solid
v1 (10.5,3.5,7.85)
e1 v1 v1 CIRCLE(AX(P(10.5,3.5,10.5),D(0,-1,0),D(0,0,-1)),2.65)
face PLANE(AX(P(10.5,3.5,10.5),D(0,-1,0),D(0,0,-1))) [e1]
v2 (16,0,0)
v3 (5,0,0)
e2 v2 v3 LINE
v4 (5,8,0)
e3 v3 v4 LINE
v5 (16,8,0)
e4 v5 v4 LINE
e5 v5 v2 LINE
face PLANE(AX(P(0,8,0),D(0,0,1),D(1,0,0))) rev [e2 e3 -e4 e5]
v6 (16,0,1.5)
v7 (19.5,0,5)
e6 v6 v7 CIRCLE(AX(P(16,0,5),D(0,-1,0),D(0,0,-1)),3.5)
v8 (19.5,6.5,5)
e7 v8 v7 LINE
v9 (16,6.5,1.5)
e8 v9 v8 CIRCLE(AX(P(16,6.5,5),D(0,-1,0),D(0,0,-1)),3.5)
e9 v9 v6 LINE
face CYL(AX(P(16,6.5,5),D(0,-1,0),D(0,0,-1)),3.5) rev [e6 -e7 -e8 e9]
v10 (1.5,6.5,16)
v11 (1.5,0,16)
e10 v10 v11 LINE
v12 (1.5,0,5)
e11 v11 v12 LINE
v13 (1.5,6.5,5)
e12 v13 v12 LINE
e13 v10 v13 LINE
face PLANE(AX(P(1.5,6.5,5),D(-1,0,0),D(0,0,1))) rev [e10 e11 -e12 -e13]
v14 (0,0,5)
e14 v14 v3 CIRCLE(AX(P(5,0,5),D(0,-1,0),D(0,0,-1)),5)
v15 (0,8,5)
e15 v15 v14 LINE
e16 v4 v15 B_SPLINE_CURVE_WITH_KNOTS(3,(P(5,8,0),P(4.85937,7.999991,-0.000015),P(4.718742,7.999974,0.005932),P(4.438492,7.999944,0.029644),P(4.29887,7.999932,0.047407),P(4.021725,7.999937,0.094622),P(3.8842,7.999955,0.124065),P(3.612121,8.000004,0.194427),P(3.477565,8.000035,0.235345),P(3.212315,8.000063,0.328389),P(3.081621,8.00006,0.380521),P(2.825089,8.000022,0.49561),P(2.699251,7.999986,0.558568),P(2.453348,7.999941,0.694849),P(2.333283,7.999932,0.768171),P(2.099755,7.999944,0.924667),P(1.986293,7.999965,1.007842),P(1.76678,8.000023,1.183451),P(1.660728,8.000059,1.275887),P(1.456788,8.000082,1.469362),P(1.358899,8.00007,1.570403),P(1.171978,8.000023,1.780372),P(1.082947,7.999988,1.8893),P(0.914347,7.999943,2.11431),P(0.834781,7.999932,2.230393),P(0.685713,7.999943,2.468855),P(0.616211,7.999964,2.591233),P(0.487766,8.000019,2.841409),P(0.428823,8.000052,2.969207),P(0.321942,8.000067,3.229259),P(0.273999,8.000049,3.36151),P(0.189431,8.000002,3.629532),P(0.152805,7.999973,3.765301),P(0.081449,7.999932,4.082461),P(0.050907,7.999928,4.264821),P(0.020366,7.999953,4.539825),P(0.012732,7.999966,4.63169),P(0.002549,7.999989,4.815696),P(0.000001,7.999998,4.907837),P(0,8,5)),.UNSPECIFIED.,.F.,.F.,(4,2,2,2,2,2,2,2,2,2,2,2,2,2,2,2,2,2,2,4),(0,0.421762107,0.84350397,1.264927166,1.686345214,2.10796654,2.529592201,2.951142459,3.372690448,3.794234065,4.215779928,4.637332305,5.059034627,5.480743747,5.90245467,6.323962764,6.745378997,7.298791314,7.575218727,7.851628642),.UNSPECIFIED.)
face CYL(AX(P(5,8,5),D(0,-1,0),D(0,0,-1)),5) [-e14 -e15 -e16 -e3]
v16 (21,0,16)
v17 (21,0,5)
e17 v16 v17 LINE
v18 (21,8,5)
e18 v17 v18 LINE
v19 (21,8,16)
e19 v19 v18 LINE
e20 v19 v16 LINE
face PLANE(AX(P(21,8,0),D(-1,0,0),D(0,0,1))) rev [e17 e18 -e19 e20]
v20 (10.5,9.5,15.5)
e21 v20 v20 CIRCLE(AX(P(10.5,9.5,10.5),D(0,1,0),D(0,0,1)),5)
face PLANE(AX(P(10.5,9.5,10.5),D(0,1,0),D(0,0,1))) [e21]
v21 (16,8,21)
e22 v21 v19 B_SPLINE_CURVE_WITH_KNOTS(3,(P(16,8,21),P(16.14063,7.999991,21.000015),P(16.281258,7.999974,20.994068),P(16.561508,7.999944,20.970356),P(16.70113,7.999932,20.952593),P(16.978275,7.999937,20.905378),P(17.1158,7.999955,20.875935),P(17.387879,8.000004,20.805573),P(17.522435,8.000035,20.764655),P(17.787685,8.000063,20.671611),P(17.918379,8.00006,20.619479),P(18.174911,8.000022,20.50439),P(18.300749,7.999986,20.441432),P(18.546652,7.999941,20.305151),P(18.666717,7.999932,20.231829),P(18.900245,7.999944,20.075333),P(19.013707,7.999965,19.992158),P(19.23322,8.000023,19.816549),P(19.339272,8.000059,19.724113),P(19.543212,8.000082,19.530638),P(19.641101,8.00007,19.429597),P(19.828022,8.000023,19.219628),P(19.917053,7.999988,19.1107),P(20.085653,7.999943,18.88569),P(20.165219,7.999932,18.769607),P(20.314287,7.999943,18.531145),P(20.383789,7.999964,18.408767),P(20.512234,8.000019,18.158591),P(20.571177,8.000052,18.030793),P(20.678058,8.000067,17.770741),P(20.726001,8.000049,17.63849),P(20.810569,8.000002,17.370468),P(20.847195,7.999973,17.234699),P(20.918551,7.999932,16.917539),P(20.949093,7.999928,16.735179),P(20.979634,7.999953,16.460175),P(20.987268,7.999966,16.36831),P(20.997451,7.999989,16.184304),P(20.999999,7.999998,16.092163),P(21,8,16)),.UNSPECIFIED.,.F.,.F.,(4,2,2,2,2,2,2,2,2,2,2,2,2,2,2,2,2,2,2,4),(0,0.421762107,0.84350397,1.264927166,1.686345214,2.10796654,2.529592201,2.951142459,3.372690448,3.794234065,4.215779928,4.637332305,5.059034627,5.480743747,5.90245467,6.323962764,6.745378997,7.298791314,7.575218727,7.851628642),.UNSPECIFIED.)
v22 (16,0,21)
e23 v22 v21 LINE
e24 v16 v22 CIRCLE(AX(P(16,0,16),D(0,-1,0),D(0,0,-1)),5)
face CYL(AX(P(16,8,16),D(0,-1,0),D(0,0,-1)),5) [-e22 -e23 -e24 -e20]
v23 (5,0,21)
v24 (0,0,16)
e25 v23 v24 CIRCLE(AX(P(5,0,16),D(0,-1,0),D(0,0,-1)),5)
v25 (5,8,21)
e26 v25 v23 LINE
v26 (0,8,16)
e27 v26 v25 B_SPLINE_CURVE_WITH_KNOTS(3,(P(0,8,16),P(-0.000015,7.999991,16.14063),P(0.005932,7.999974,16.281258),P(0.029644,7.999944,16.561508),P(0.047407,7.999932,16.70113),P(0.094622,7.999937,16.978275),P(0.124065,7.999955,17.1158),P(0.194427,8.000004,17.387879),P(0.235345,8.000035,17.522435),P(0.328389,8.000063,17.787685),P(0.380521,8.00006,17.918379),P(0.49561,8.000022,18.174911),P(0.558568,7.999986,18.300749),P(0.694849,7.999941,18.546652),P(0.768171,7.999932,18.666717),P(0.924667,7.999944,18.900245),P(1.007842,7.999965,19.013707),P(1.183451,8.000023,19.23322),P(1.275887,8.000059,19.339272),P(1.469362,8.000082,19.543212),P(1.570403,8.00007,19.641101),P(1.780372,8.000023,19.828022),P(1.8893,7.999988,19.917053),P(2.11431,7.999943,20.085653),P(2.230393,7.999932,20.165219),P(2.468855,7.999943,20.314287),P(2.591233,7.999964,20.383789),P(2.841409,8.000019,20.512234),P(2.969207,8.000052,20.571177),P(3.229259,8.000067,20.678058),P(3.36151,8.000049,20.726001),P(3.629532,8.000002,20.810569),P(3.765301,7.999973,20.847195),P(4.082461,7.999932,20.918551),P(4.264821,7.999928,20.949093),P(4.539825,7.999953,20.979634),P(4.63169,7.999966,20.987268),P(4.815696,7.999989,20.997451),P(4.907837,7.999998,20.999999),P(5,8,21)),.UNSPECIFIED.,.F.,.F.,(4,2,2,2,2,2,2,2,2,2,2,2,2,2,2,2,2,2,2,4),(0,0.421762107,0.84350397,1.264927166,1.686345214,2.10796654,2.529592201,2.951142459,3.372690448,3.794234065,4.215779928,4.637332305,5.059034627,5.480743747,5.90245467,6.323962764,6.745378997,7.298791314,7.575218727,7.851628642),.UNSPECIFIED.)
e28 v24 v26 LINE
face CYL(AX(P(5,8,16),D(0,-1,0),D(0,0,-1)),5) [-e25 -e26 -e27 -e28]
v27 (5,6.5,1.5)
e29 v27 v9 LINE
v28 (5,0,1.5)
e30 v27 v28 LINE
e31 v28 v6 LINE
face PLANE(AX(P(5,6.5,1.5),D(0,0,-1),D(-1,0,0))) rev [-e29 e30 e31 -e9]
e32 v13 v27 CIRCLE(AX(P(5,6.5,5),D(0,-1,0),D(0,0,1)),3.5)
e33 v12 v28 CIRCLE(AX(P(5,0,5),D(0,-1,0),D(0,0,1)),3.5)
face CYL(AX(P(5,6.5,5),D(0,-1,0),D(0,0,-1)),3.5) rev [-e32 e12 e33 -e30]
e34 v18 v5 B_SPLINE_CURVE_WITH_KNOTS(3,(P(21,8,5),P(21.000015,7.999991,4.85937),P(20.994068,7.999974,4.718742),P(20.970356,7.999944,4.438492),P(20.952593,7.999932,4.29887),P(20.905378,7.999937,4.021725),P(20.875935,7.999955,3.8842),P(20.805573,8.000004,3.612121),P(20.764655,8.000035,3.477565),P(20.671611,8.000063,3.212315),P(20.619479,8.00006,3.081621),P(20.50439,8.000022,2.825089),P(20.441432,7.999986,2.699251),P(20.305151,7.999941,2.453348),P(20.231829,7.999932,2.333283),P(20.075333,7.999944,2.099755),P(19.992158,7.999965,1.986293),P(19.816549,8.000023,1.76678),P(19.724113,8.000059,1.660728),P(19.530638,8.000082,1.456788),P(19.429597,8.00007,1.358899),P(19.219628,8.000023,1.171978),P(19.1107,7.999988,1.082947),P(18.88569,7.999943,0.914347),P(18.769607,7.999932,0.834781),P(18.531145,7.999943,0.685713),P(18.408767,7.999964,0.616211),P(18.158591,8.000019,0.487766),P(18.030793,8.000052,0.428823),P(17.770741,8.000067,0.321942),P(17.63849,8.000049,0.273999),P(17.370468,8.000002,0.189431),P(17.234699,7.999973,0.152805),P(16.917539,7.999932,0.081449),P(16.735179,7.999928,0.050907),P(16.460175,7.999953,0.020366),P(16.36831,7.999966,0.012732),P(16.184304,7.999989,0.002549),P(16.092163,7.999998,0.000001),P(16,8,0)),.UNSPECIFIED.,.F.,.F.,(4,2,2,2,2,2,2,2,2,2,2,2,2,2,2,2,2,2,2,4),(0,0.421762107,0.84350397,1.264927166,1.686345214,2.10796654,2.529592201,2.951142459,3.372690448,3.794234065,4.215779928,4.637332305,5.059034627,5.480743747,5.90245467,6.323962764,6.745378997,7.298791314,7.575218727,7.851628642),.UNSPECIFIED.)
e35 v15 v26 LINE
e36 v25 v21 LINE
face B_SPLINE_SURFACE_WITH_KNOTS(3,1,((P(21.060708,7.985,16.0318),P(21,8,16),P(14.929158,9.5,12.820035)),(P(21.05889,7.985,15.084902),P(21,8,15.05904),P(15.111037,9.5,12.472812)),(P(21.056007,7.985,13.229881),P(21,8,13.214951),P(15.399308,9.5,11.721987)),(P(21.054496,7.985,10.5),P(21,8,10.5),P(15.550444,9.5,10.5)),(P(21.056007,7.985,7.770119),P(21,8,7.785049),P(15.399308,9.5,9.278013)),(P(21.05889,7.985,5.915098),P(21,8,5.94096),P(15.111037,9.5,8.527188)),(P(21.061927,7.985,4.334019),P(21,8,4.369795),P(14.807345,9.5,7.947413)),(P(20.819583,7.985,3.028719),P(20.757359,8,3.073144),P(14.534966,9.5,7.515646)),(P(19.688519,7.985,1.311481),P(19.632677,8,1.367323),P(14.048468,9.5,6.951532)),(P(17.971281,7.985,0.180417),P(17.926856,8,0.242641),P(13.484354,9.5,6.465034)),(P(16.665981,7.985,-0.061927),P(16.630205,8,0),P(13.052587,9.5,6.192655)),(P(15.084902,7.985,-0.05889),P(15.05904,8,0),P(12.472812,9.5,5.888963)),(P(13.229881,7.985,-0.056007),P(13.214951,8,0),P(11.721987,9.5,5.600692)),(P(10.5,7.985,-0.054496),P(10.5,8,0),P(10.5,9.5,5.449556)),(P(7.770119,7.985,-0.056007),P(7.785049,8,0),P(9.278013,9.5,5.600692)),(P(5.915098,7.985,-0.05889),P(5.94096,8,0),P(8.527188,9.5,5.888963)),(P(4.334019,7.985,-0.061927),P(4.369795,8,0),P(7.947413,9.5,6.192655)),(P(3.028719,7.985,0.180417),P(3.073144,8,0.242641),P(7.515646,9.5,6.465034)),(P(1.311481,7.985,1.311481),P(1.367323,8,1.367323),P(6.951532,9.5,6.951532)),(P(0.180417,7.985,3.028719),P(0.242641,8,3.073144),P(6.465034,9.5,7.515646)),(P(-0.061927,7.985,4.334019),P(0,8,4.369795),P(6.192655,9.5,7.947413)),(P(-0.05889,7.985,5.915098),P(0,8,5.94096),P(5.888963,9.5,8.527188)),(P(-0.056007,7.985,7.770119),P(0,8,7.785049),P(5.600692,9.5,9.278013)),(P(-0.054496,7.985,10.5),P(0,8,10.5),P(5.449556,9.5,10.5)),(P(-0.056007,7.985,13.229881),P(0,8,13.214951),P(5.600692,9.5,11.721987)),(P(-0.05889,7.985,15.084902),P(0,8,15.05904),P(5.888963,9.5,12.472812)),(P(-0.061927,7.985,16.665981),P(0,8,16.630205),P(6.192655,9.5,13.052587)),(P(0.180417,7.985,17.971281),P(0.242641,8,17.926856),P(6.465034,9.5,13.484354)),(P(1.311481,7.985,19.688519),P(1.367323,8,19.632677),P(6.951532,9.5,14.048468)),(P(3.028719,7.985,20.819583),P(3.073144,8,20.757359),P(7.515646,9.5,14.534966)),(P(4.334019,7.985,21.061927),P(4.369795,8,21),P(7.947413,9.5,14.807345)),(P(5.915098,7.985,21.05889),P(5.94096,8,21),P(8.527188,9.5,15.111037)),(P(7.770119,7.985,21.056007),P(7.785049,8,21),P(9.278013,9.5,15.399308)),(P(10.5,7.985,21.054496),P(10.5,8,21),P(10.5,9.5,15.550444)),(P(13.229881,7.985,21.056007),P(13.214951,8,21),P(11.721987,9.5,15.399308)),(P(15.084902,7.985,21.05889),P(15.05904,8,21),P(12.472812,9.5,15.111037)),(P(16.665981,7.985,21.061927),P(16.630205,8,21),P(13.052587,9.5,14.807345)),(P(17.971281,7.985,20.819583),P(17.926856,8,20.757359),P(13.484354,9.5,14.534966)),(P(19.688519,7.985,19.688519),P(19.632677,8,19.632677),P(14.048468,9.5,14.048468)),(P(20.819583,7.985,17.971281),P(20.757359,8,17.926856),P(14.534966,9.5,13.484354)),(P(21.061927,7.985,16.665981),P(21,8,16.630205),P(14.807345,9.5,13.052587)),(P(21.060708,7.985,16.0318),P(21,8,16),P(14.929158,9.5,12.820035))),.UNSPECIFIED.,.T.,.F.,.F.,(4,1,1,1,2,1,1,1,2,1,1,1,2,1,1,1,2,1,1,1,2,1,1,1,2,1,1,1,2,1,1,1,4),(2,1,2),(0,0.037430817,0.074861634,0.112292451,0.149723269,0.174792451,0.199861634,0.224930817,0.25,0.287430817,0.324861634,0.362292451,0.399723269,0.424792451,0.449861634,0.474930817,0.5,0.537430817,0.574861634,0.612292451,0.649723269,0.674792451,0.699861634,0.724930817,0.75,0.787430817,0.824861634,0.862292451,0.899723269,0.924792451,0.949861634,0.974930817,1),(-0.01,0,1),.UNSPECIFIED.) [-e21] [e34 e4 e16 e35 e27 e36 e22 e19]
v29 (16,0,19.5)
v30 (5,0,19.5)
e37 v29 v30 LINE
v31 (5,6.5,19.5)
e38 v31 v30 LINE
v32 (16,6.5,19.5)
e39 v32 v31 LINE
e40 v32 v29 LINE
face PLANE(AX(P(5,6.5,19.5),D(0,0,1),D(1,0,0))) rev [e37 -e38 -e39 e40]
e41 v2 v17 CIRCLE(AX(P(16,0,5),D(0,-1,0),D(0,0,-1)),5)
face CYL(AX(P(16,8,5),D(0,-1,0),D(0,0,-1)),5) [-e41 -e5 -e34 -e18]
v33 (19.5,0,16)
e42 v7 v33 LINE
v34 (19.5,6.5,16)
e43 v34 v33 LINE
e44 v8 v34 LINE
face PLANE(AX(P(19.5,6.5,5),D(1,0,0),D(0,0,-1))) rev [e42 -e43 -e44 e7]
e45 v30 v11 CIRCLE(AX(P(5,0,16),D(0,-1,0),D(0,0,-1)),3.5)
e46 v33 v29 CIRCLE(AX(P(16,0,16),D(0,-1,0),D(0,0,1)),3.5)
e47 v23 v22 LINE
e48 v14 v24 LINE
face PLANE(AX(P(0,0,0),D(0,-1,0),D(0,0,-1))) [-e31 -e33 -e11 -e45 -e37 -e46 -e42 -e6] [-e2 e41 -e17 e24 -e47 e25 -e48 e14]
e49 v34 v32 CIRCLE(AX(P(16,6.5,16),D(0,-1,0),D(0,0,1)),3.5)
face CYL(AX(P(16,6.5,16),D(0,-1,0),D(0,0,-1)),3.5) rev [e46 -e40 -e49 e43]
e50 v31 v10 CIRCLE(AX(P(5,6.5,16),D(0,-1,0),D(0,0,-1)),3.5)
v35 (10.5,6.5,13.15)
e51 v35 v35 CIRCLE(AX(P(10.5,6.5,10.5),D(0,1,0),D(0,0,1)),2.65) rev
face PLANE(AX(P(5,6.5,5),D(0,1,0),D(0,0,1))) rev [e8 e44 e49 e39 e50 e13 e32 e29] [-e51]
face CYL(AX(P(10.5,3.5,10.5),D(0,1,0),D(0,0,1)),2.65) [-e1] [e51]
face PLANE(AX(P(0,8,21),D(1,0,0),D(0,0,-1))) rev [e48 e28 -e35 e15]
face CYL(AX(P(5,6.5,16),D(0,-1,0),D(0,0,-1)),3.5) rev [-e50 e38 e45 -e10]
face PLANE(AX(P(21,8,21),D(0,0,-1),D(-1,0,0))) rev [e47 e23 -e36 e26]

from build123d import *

# Parameters (mm, degrees)
SKETCH1_W           = 21
SKETCH1_H           = 21
BOSS_EXTRUDE1_DEPTH = 8
FILLET1_R           = 5
CUT_EXTRUDE2_DEPTH  = 6.5
SKETCH11_R          = 2.65
BOSS_EXTRUDE4_DEPTH = 3
SKETCH2_R           = 5


with BuildPart() as part:
    # Sketch1 → Boss-Extrude1 (new body)
    with BuildSketch(Plane(origin=(0, 0, 0), x_dir=(1, 0, 0), z_dir=(0, 1, 0))):
        with Locations((10.5, -10.5)):
            Rectangle(SKETCH1_W, SKETCH1_H)
    extrude(amount=BOSS_EXTRUDE1_DEPTH)

    # Fillet1
    fillet1_edges = [part.edges().sort_by_distance(p)[0] for p in [
        (0, 4, 0),
        (21, 4, 0),
        (21, 4, 21),
        (0, 4, 21),
    ]]
    fillet(fillet1_edges, radius=FILLET1_R)

    # Sketch10 → Cut-Extrude2 (cut)
    with BuildSketch(Plane.XZ):
        with BuildLine():
            Line((5, 1.5), (16, 1.5))
            ThreePointArc((16, 1.5), (18.474873734, 2.525126266), (19.5, 5))
            Line((19.5, 5), (19.5, 16))
            ThreePointArc((19.5, 16), (18.474873734, 18.474873734), (16, 19.5))
            Line((16, 19.5), (5, 19.5))
            ThreePointArc((5, 19.5), (2.525126266, 18.474873734), (1.5, 16))
            Line((1.5, 16), (1.5, 5))
            ThreePointArc((1.5, 5), (2.525126266, 2.525126266), (5, 1.5))
        make_face()
    extrude(amount=-CUT_EXTRUDE2_DEPTH, mode=Mode.SUBTRACT)

    # Sketch11 → Boss-Extrude4 (add)
    with BuildSketch(Plane.XZ.offset(-6.5)):
        with Locations(Location((10.5, 10.5, 0), (0, 0, 90))):
            Circle(SKETCH11_R)
    extrude(amount=BOSS_EXTRUDE4_DEPTH)

    # Sketch3 → Loft2 section 0
    with BuildSketch(Plane(origin=(0, 8, 0), x_dir=(1, 0, 0), z_dir=(0, 1, 0))):
        with BuildLine():
            Line((16, 0), (5, 0))
            ThreePointArc((5, 0), (1.464466094, -1.464466094), (0, -5))
            Line((0, -5), (0, -16))
            ThreePointArc((0, -16), (1.464466094, -19.535533906), (5, -21))
            Line((5, -21), (16, -21))
            ThreePointArc((16, -21), (19.535533906, -19.535533906), (21, -16))
            Line((21, -16), (21, -5))
            ThreePointArc((21, -5), (19.535533906, -1.464466094), (16, 0))
        make_face()
    # Sketch2 → Loft2 section 1
    with BuildSketch(Plane(origin=(0, 9.5, 0), x_dir=(1, 0, 0), z_dir=(0, 1, 0))):
        with Locations((10.5, -10.5)):
            Circle(SKETCH2_R)
    loft()


solid = part.part
